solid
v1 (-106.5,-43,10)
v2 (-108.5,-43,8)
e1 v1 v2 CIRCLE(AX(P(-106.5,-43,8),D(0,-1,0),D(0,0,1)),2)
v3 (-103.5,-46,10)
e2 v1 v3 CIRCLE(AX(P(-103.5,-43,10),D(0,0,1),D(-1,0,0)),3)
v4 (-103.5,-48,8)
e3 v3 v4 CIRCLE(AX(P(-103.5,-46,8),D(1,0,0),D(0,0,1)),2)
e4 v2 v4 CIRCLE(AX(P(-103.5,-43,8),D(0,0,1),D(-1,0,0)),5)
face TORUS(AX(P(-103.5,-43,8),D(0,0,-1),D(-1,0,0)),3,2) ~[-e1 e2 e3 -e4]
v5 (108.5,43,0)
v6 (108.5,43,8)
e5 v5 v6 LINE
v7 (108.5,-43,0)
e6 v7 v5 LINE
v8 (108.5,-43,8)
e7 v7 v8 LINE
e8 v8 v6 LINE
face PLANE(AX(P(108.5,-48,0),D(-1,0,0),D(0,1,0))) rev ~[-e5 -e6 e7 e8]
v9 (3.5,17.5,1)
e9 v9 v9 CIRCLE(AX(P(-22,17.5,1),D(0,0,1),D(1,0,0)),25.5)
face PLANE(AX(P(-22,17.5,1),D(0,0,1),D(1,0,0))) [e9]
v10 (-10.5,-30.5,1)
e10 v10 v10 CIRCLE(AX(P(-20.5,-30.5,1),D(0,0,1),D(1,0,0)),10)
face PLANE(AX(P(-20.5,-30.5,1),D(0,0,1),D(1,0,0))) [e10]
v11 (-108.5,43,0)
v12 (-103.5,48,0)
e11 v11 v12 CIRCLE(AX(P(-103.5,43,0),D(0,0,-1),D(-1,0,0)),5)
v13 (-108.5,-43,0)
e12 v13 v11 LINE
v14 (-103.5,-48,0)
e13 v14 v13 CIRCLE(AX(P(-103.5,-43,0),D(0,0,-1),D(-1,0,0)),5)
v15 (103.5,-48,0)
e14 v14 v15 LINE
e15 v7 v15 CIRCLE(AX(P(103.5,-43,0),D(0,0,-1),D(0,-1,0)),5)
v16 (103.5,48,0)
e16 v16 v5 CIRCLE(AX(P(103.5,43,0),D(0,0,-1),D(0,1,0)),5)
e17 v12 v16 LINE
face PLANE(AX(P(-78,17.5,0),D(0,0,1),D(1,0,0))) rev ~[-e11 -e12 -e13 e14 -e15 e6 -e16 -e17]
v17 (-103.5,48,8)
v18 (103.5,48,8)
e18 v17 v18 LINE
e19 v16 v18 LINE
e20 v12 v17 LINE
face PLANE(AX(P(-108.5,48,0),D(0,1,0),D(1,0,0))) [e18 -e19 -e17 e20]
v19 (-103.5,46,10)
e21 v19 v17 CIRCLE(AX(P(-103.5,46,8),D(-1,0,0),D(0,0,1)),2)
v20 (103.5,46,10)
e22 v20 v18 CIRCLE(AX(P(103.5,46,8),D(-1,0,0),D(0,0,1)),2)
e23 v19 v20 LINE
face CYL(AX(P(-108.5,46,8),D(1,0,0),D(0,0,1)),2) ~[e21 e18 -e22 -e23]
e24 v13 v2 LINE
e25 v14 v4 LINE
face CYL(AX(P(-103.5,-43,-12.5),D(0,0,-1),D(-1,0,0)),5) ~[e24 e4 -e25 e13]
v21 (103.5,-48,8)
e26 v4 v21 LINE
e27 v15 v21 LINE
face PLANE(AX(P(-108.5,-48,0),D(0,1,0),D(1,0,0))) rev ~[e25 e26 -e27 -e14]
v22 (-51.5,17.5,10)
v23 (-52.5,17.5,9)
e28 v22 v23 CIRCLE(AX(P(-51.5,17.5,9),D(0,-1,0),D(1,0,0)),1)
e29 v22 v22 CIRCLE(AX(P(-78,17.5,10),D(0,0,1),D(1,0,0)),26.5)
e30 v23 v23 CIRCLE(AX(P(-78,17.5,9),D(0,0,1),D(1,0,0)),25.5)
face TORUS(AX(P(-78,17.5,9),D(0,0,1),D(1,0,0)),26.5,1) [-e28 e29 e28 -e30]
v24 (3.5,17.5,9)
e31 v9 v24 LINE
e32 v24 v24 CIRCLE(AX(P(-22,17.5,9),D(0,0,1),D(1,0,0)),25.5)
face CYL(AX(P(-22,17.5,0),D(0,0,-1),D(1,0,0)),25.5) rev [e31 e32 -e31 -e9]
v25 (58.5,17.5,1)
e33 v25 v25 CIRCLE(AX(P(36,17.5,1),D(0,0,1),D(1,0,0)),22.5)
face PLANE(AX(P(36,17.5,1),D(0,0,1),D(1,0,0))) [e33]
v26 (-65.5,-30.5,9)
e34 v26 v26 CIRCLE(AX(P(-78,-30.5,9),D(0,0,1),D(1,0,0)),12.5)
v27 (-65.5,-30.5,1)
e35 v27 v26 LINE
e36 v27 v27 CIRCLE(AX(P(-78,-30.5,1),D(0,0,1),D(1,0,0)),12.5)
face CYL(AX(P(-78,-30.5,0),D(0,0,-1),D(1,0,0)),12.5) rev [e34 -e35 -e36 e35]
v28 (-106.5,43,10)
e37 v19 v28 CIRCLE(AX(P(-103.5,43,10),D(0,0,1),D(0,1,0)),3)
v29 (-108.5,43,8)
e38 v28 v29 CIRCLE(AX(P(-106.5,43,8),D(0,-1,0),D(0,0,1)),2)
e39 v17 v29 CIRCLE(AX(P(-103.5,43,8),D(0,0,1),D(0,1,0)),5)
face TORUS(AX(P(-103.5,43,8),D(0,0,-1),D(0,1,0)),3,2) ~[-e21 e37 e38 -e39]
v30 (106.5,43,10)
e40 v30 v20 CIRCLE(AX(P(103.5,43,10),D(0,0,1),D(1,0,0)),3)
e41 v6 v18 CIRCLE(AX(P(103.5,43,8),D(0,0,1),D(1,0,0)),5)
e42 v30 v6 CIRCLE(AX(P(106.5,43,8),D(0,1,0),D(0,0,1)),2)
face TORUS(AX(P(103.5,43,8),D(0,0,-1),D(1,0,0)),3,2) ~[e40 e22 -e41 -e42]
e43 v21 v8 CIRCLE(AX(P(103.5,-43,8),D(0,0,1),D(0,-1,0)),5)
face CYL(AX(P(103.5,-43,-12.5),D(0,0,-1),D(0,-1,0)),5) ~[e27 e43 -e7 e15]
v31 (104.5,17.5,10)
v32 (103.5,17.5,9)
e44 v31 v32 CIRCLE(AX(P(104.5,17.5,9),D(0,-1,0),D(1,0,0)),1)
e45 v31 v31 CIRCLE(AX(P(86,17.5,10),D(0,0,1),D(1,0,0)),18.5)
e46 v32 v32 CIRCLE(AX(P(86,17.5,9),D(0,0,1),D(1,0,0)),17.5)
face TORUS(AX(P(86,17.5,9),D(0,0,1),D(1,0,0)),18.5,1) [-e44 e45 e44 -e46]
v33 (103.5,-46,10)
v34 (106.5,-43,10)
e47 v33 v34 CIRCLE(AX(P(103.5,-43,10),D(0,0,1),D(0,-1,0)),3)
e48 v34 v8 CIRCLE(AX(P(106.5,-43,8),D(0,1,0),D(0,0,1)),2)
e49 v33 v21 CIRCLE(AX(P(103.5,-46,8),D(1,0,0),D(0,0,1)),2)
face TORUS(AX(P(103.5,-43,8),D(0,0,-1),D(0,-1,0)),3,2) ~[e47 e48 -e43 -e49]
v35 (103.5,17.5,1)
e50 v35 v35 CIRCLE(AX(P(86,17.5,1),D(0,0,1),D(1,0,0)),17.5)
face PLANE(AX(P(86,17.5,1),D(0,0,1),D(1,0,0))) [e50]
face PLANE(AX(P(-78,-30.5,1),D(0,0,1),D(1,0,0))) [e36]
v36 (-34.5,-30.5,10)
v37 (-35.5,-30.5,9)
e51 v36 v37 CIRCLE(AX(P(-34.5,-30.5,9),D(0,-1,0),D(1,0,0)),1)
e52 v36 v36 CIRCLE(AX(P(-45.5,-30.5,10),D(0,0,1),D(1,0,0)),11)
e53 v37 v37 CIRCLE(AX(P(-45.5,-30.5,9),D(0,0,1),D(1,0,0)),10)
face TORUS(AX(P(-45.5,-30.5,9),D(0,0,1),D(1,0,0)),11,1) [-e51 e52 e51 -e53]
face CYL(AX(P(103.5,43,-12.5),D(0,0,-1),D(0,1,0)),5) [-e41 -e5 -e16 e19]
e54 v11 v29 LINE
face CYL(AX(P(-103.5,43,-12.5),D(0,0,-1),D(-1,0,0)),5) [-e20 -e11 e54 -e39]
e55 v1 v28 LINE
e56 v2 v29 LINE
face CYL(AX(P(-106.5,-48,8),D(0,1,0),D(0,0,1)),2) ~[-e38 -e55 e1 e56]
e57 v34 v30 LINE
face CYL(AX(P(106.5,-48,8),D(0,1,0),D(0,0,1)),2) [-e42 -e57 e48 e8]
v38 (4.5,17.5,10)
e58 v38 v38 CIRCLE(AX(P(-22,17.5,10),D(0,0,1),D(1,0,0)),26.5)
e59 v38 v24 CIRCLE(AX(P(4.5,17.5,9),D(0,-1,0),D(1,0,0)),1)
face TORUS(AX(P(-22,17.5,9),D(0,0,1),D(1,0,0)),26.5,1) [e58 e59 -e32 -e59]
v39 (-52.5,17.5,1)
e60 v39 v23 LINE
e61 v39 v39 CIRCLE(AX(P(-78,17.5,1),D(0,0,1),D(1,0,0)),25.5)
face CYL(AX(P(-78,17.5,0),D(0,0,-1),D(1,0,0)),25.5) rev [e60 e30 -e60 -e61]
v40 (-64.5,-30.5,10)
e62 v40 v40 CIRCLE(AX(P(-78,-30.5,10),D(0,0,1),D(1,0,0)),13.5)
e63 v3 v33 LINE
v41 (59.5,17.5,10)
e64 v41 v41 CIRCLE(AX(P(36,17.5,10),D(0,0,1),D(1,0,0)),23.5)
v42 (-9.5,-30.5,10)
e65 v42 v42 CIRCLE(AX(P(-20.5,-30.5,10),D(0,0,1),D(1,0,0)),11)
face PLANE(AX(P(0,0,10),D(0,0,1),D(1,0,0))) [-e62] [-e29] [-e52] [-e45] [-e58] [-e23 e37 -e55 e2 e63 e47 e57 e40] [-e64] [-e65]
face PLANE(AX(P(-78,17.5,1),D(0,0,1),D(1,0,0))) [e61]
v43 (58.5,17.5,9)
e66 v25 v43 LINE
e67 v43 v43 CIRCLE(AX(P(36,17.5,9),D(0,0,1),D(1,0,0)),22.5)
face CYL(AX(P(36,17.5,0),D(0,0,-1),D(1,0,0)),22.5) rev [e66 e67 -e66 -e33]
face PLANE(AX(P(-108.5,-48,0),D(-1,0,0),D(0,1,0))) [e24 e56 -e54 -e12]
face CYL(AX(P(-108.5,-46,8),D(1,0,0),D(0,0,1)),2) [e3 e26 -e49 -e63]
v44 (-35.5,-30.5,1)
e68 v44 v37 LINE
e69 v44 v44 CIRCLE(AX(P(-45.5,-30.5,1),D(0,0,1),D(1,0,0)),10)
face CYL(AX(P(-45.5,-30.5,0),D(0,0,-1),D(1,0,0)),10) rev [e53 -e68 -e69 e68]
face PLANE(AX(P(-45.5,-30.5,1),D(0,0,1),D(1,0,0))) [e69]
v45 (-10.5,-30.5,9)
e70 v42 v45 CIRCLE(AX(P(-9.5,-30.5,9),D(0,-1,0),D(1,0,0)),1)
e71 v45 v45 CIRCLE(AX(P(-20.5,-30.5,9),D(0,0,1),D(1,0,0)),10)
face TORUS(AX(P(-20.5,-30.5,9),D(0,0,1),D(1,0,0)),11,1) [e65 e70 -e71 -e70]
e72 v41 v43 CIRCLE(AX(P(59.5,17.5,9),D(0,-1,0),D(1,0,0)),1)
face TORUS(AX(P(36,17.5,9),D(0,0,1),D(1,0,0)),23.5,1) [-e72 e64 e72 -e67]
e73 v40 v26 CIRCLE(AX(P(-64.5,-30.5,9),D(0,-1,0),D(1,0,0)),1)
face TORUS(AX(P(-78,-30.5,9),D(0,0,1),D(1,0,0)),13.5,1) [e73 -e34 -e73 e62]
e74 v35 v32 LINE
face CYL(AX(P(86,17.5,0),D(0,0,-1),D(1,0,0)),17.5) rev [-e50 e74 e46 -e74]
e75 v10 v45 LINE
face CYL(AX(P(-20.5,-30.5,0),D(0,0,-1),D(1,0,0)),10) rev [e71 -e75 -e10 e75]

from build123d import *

# Parameters (mm, degrees)
F0_W         = 217
F0_H         = 96
F0_R         = 12.5
F0_R_2       = 10
F0_R_3       = 25.5
F0_R_4       = 22.5
F0_R_5       = 17.5
F1_DEPTH     = 10
F2_DEPTH     = 1
F3_R         = 1
F4_R         = 2
F5_T1_DEPTH  = 22.5
F5_T4_ANGLE  = 90
F5_T6_ANGLE  = 90
F5_T8_ANGLE  = 90
F5_T10_ANGLE = 90


# Not quite as in the source:
# - a fillet or chamfer that OpenCascade refuses, or shapes differently, is made with other operations: its cross-section is extruded or revolved along the edge and cut away or added


with BuildPart() as f1:
    # F0 (on Top) → F1 (new body)
    with BuildSketch(Plane.XY):
        Rectangle(F0_W, F0_H)
        with Locations((-78, -30.5)):
            Circle(F0_R, mode=Mode.SUBTRACT)
        with Locations((-45.5, -30.5)):
            Circle(F0_R_2, mode=Mode.SUBTRACT)
        with Locations((-20.5, -30.5)):
            Circle(F0_R_2, mode=Mode.SUBTRACT)
        with Locations((-78, 17.5)):
            Circle(F0_R_3, mode=Mode.SUBTRACT)
        with Locations((-22, 17.5)):
            Circle(F0_R_3, mode=Mode.SUBTRACT)
        with Locations((36, 17.5)):
            Circle(F0_R_4, mode=Mode.SUBTRACT)
        with Locations((86, 17.5)):
            Circle(F0_R_5, mode=Mode.SUBTRACT)
    extrude(amount=F1_DEPTH)

    # F0 (on Top) → F2 (join)
    with BuildSketch(Plane.XY):
        with Locations((-78, 17.5)):
            Circle(F0_R_3)
        with Locations((-22, 17.5)):
            Circle(F0_R_3)
        with Locations((36, 17.5)):
            Circle(F0_R_4)
        with Locations((86, 17.5)):
            Circle(F0_R_5)
        with Locations((-78, -30.5)):
            Circle(F0_R)
        with Locations((-45.5, -30.5)):
            Circle(F0_R_2)
        with Locations((-20.5, -30.5)):
            Circle(F0_R_2)
    extrude(amount=F2_DEPTH)

    # F3
    f3_edges = [f1.edges().sort_by_distance(p)[0] for p in [
        (-103.5, 17.5, 10),
        (-47.5, 17.5, 10),
        (13.5, 17.5, 10),
        (68.5, 17.5, 10),
        (-90.5, -30.5, 10),
        (-55.5, -30.5, 10),
        (-30.5, -30.5, 10),
    ]]
    fillet(f3_edges, radius=F3_R)

    # F4
    f4_edges = [f1.edges().sort_by_distance(p)[0] for p in [
        (-108.5, 0, 10),
        (0, 48, 10),
        (108.5, 0, 10),
        (0, -48, 10),
    ]]
    fillet(f4_edges, radius=F4_R)

    # F5: fillet of radius 5 on 8 edges, made by hand

    # F5_s2 → F5_t1 (cut)
    with BuildSketch(Plane.XY.offset(-12.5)):
        with BuildLine():
            ThreePointArc((-108.5, -43), (-107.0355339059, -46.5355339059), (-103.5, -48))
            Line((-103.5, -48), (-108.5, -48))
            Line((-108.5, -48), (-108.5, -43))
        make_face()
        with BuildLine():
            ThreePointArc((-108.5, 43), (-107.0355339059, 46.5355339059), (-103.5, 48))
            Line((-103.5, 48), (-108.5, 48))
            Line((-108.5, 48), (-108.5, 43))
        make_face()
        with BuildLine():
            ThreePointArc((103.5, 48), (107.0355339059, 46.5355339059), (108.5, 43))
            Line((108.5, 43), (108.5, 48))
            Line((108.5, 48), (103.5, 48))
        make_face()
        with BuildLine():
            ThreePointArc((103.5, -48), (107.0355339059, -46.5355339059), (108.5, -43))
            Line((108.5, -43), (108.5, -48))
            Line((108.5, -48), (103.5, -48))
        make_face()
    extrude(amount=F5_T1_DEPTH, mode=Mode.SUBTRACT)

    # F5_s3 → F5_t4 (revolve, cut)
    with BuildSketch(Plane.XZ.offset(43)):
        with BuildLine():
            ThreePointArc((-106.5, 10), (-107.9142135624, 9.4142135624), (-108.5, 8))
            Line((-108.5, 8), (-108.5, 10))
            Line((-108.5, 10), (-106.5, 10))
        make_face()
    revolve(axis=Axis((-103.5, -43, 10), (0, 0, 1)), revolution_arc=F5_T4_ANGLE, mode=Mode.SUBTRACT)

    # F5_s5 → F5_t6 (revolve, cut)
    with BuildSketch(Plane.YZ.offset(-103.5)):
        with BuildLine():
            ThreePointArc((46, 10), (47.4142135624, 9.4142135624), (48, 8))
            Line((48, 8), (48, 10))
            Line((48, 10), (46, 10))
        make_face()
    revolve(axis=Axis((-103.5, 43, 10), (0, 0, 1)), revolution_arc=F5_T6_ANGLE, mode=Mode.SUBTRACT)

    # F5_s7 → F5_t8 (revolve, cut)
    with BuildSketch(Plane.XZ.offset(-43)):
        with BuildLine():
            ThreePointArc((106.5, 10), (107.9142135624, 9.4142135624), (108.5, 8))
            Line((108.5, 8), (108.5, 10))
            Line((108.5, 10), (106.5, 10))
        make_face()
    revolve(axis=Axis((103.5, 43, 10), (0, 0, 1)), revolution_arc=F5_T8_ANGLE, mode=Mode.SUBTRACT)

    # F5_s9 → F5_t10 (revolve, cut)
    with BuildSketch(Plane.YZ.offset(103.5)):
        with BuildLine():
            ThreePointArc((-46, 10), (-47.4142135624, 9.4142135624), (-48, 8))
            Line((-48, 8), (-48, 10))
            Line((-48, 10), (-46, 10))
        make_face()
    revolve(axis=Axis((103.5, -43, 10), (0, 0, 1)), revolution_arc=F5_T10_ANGLE, mode=Mode.SUBTRACT)


solid = f1.part
